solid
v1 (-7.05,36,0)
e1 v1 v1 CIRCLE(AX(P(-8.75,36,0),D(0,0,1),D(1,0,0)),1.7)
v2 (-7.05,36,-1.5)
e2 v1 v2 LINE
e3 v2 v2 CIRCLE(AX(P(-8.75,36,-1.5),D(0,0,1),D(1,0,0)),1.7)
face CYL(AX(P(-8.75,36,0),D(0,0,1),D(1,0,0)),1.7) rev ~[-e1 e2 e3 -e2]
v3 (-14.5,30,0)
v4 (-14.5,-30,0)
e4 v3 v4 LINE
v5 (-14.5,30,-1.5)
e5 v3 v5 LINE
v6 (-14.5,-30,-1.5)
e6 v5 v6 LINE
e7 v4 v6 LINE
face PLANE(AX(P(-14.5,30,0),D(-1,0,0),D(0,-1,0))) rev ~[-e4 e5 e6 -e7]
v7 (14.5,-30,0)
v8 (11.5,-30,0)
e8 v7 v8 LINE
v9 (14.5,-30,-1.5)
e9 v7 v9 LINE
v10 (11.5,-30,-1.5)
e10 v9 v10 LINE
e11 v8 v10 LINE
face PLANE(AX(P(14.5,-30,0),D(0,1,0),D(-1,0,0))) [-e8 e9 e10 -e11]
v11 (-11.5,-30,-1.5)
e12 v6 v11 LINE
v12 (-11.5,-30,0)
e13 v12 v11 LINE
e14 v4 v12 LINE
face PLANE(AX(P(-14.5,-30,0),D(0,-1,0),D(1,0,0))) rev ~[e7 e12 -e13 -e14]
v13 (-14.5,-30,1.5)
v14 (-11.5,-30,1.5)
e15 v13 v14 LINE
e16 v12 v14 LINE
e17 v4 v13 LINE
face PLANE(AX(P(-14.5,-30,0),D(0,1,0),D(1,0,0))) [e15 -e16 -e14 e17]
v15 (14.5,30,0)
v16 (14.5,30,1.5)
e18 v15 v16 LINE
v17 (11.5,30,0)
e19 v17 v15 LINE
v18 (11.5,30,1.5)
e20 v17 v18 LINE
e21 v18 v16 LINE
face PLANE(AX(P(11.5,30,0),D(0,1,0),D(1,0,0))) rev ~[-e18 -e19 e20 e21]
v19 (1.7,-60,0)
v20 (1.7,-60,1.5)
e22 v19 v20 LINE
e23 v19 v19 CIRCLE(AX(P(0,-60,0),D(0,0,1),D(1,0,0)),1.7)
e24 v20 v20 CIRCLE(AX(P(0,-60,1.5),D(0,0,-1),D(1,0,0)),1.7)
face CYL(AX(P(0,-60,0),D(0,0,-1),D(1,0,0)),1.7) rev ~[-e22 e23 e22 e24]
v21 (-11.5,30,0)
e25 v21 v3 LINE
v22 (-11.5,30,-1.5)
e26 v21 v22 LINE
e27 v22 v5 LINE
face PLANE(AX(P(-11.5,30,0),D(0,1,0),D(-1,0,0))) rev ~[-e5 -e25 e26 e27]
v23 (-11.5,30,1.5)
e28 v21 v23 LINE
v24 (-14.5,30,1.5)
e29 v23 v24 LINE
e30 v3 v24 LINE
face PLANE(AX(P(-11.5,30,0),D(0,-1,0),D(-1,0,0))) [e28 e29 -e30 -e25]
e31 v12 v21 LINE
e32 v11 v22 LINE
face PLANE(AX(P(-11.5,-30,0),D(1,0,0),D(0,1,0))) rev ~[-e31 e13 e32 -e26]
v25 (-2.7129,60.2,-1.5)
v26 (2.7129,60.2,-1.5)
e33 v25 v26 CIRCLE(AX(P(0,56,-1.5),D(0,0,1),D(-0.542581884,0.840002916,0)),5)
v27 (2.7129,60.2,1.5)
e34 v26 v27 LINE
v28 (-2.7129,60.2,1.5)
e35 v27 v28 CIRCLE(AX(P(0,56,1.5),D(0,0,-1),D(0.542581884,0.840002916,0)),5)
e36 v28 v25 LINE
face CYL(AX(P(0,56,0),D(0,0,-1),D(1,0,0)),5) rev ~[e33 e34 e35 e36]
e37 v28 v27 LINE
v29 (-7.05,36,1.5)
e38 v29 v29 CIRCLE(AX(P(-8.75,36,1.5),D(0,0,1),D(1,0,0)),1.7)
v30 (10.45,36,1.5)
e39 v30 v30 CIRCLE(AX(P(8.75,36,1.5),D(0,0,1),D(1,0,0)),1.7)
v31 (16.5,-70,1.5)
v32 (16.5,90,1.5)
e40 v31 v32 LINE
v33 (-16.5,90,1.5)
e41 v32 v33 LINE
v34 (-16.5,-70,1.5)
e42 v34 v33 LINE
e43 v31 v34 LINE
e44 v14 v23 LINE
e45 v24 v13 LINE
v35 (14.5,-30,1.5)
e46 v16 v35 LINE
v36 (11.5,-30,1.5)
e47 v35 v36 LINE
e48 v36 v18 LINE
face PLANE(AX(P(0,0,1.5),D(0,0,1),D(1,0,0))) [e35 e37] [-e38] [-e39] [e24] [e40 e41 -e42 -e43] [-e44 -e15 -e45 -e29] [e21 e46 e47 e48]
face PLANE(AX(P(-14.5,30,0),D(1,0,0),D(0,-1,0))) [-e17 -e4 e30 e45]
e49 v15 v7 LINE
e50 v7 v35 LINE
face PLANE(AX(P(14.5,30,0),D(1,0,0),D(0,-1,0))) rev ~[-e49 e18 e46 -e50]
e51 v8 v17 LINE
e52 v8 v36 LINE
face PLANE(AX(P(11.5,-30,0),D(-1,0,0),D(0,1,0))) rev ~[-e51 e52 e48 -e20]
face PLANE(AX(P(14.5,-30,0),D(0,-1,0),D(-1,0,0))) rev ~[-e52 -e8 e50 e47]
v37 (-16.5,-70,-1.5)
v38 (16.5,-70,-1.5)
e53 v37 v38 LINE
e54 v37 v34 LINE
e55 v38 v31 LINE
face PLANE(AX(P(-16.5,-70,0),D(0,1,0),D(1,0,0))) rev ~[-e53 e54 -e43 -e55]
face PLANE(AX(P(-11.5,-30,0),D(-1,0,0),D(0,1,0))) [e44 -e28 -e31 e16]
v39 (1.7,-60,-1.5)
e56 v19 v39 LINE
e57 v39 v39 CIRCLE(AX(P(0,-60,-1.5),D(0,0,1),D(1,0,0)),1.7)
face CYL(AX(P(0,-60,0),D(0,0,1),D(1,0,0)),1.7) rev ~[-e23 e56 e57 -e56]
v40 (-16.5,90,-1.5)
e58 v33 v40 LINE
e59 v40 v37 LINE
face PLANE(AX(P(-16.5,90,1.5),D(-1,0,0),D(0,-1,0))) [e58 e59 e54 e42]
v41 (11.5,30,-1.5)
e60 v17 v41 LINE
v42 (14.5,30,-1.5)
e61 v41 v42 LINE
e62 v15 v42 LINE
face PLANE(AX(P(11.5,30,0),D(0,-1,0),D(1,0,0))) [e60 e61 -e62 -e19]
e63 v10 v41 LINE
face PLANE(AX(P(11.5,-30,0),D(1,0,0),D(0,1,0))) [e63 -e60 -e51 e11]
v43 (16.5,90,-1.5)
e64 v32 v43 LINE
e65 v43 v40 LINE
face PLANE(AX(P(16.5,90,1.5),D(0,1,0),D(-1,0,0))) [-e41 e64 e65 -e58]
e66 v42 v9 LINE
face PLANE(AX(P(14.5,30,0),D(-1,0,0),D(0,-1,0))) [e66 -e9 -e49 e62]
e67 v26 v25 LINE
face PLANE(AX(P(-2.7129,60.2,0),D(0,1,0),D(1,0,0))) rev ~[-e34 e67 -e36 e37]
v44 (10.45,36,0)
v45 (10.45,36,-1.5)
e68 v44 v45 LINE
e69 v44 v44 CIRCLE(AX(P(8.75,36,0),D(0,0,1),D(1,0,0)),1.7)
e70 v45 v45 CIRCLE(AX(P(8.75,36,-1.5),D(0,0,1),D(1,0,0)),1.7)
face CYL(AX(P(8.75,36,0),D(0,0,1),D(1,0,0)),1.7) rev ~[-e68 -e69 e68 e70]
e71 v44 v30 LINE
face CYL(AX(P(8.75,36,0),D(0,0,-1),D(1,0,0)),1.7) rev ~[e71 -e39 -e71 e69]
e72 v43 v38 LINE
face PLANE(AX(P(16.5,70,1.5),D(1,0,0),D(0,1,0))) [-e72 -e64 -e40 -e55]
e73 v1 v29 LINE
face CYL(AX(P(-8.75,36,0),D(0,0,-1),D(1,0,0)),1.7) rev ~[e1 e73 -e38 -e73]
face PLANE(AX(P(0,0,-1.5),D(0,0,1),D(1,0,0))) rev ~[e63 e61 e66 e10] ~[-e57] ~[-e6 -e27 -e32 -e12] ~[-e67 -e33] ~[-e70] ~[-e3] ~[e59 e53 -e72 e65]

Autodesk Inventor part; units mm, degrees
ref_plane "YZ Plane" through (0, 0, 0) normal (1, 0, 0) x (0, 1, 0)
ref_plane "XZ Plane" through (0, 0, 0) normal (0, 1, 0) x (-1, 0, 0)
ref_plane "XY Plane" through (0, 0, 0) normal (0, 0, 1) x (1, 0, 0)
sketch "Sketch1" plane through (0, 0, 0) normal (0, 0, 1) x (1, 0, 0)
  line L0 (-16.5, -70) -> (16.5, -70)
  line L1 (16.5, -70) -> (16.5, 70)
  line L2 (16.5, 70) -> (-16.5, 70)
  line L3 (-16.5, 70) -> (-16.5, -70)
  line L4 (-16.5, -70) -> (16.5, 70) construction
  line L5 (16.5, -70) -> (-16.5, 70) construction
  line L6 (0, 70) -> (0, -70)
  line L7 (11.5, 30) -> (14.5, 30)
  line L8 (14.5, 30) -> (14.5, -30)
  line L9 (14.5, -30) -> (11.5, -30)
  line L10 (11.5, -30) -> (11.5, 30)
  circle A0 centre (0, 56) radius 5
  line L11 (-11.5, 30) -> (-14.5, 30)
  line L12 (-14.5, 30) -> (-14.5, -30)
  line L13 (-14.5, -30) -> (-11.5, -30)
  line L14 (-11.5, -30) -> (-11.5, 30)
  circle A1 centre (0, -60) radius 1.7
  circle A2 centre (-8.75, 36) radius 1.7
  circle A3 centre (8.75, 36) radius 1.7
  line L15 (-2.7129, 60.2) -> (2.7129, 60.2)
  point P0 (0, 0)
  point P1 (14.5, 0)
  point P2 (16.5, 0)
  point P3 (-14.5, 0)
  dimension "d1" = 140
  dimension "d2" = 3
  dimension "d3" = 2
  dimension "d4" = 60
  dimension "d5" = 10
  dimension "d6" = 14
  dimension "d7" = 3.4
  dimension "d8" = 10
  dimension "d9" = 3.4
  dimension "d10" = 23
  dimension "d11" = 20
  dimension "d21" = 4.2
  dimension "d22" = 17.5
sketch "Sketch3" plane through (0, 0, 1.5) normal (0, 0, 1) x (1, 0, 0)
  line L0 (-16.5, 70) -> (-16.5, -70)
  line L1 (-16.5, 70) -> (16.5, 70)
  line L2 (16.5, 70) -> (16.5, 90)
  line L3 (16.5, 90) -> (-16.5, 90)
  line L4 (-16.5, 90) -> (-16.5, 70)
  line L5 (16.5, 70) -> (16.5, -70)
  point P0 (0, 0)
  point P1 (16.5, 0)
  dimension "d24" = 20
extrude "Plate1" add sketch "Sketch1" along normal mid plane 3 contours L3 L2 L6 A0 A1 L0 | L6 A1 A0 L2 L1 L0 | A0 L15 L6 | L6 L15 A0 picked at (1.5261, 60.3463) picked at (-1.5261, 60.3463)
sheet face with bend "Face3" sketch "Sketch3" thickness 3 toward (0, 0, -1) bend radius 3
bend "Bend2"
equation "\"d13\" = Thickness"
equation "\"d25\" = BendRadius"
equation "\"d26\" = BendReliefWidth"
equation "\"d28\" = MinimumRemnant"
equation "\"d27\" = BendReliefDepth"
equation "\"d29\" = TransitionRadius"
equation "\"BendRadius\" = Thickness"
equation "\"BendReliefWidth\" = Thickness"
equation "\"BendReliefDepth\" = 0.5 * Thickness"
equation "\"CornerReliefSize\" = 4 * Thickness"
equation "\"MinimumRemnant\" = 2 * Thickness"
equation "\"TransitionRadius\" = BendRadius"
equation "\"JacobiRadiusSize\" = BendRadius"
equation "\"GapSize\" = Thickness"
equation "\"Thickness\" = 3"
properties part number "Motor Fixation .1"
